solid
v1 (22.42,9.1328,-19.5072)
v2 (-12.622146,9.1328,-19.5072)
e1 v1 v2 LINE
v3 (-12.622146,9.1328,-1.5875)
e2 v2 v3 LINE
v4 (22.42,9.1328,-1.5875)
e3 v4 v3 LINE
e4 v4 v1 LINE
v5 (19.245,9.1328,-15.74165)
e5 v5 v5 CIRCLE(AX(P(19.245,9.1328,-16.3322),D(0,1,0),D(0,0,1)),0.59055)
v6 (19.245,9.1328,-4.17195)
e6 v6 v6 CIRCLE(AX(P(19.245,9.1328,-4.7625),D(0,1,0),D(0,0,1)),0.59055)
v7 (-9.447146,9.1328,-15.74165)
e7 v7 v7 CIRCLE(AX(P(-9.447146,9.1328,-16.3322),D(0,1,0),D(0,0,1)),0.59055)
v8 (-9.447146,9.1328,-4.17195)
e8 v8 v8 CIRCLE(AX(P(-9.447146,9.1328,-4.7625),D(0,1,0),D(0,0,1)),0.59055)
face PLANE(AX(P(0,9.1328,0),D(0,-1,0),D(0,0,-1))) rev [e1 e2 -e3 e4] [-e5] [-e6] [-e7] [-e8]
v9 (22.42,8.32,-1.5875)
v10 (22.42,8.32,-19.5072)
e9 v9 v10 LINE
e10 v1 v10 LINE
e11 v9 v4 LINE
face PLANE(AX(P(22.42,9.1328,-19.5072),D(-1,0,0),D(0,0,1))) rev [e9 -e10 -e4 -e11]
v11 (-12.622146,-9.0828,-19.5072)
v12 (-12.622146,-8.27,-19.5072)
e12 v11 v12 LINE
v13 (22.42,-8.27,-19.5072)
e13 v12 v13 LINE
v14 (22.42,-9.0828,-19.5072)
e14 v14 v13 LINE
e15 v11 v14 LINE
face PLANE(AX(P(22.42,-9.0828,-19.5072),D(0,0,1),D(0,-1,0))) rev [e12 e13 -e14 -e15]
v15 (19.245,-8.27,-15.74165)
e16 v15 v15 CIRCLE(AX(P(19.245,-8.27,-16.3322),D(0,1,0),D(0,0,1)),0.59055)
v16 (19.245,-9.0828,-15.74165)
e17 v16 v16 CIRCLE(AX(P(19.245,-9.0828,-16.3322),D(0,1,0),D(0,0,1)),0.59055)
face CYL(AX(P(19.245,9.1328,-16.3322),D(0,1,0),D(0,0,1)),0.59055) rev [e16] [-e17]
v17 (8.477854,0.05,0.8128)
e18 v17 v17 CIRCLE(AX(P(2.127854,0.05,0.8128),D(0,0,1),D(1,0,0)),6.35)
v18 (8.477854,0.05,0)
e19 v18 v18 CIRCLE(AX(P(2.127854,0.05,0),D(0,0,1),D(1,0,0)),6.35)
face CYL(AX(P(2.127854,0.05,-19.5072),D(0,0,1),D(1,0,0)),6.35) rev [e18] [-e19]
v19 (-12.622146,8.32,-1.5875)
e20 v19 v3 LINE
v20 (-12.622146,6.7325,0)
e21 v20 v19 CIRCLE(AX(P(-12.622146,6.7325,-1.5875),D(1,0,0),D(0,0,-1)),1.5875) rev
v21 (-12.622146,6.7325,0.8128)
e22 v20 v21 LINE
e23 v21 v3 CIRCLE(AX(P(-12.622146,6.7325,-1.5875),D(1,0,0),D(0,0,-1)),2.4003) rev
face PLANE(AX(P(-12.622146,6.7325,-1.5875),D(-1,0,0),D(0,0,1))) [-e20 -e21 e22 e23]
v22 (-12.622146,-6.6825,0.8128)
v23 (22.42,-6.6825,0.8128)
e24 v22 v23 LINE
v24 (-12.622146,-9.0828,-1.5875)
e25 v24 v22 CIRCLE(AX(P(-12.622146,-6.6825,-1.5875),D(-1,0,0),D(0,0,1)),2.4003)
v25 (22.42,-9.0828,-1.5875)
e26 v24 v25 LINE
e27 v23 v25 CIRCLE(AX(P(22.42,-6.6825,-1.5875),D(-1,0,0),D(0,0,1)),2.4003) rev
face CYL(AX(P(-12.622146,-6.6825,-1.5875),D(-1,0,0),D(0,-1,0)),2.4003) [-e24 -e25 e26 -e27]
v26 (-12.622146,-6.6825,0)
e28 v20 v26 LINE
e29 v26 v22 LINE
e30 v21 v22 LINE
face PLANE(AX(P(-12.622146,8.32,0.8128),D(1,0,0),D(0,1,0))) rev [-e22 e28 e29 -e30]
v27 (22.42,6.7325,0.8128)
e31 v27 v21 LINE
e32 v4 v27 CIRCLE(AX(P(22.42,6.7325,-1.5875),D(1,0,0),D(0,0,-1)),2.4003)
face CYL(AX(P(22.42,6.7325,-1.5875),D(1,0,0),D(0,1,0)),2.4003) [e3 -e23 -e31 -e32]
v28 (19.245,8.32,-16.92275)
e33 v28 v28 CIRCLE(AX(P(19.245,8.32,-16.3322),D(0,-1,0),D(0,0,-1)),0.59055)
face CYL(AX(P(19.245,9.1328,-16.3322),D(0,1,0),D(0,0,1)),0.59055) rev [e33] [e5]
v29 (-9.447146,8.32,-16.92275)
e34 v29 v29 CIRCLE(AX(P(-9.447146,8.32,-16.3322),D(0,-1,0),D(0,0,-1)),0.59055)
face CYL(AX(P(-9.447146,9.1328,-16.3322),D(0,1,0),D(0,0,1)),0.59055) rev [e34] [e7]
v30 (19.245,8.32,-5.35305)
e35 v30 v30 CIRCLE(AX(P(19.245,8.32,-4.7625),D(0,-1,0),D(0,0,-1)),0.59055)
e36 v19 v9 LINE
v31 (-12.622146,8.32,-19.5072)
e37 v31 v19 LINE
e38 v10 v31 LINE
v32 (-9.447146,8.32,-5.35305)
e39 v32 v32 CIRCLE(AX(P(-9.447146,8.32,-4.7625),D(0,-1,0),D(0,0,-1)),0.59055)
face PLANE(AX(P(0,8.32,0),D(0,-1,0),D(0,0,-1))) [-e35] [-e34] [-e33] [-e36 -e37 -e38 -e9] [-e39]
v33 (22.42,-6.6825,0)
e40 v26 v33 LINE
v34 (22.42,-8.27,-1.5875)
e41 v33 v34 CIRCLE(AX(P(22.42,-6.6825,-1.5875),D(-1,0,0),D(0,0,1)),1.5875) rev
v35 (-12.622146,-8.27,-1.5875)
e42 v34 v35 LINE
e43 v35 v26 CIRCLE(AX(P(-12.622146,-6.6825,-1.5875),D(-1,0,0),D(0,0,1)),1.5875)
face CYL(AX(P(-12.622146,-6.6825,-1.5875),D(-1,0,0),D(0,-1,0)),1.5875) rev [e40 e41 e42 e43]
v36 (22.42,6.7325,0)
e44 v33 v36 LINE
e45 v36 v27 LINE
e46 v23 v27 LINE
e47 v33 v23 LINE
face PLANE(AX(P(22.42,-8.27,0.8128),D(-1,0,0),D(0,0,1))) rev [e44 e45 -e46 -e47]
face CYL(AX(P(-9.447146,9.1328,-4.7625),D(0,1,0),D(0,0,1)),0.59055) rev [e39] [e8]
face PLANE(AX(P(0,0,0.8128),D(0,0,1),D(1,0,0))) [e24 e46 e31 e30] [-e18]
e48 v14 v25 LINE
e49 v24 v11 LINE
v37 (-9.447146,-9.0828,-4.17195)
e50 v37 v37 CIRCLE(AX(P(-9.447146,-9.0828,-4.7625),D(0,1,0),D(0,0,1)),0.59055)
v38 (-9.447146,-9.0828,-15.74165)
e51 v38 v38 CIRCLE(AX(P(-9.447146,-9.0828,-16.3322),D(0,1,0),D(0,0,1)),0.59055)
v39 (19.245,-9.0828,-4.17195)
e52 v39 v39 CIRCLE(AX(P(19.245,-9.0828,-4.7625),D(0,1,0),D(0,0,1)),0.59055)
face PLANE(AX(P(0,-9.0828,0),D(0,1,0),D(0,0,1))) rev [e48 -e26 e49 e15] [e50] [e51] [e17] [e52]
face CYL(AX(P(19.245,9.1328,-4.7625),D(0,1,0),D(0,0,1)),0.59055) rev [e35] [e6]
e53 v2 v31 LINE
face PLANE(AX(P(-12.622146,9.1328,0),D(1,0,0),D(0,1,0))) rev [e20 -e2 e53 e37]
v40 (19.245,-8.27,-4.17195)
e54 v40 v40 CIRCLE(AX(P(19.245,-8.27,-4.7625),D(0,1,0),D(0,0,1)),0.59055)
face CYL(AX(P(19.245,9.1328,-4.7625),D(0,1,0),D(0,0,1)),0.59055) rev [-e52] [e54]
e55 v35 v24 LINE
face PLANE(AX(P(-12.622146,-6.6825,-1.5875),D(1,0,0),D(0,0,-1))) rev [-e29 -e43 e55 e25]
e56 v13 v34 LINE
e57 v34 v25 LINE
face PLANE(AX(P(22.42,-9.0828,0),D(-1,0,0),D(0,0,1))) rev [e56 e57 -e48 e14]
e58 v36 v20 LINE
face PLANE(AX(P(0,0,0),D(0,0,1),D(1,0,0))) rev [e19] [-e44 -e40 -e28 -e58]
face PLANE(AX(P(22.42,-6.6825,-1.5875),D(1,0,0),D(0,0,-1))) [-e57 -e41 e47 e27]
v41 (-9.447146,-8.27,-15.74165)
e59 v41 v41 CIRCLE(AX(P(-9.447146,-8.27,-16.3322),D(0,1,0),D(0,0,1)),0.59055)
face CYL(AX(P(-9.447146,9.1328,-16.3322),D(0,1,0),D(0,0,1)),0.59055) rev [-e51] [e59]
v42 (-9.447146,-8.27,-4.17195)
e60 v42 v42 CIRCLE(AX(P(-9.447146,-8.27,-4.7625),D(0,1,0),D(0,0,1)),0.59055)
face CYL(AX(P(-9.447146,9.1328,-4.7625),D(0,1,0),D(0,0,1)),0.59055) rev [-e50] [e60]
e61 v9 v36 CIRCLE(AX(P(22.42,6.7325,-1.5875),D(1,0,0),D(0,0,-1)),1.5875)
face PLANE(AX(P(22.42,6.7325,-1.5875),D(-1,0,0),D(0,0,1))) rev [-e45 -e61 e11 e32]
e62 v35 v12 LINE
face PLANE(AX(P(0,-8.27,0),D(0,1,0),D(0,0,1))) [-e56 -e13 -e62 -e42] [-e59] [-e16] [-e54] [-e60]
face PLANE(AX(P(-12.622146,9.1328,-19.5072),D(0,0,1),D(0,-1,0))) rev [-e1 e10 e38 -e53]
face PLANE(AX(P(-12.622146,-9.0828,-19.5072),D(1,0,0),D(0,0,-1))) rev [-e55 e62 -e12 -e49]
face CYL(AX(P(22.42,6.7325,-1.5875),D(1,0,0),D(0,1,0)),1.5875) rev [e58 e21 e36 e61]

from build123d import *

# Parameters (mm, degrees)
BASE_FLANGE1_DEPTH             = 0.8128
EDGE_FLANGE1_STRIP_W           = 6.4262
EDGE_FLANGE1_STRIP_H           = 0.8128
EDGE_FLANGE1_STRIP_CUT_DEPTH   = 35.042145822
EDGE_FLANGE1_STRIP_2_W         = 6.4262
EDGE_FLANGE1_STRIP_2_H         = 0.8128
EDGE_FLANGE1_STRIP_CUT_2_DEPTH = 35.042145822
EDGE_FLANGE1_DEPTH             = 35.042145822
EDGE_FLANGE1_BEND_DEPTH        = 35.042145822
SKETCH12_R                     = 6.35
CUT_EXTRUDE1_DEPTH             = 32.60643662
F_56_0_0465_DIAMETER_HOLE1_D   = 1.1811


# Sheet-metal steps are written as plain solids
with BuildPart() as part:
    # Sketch1 → Base-Flange1 (new body)
    with BuildSketch(Plane.XY):
        Polygon((-12.622145822, 8.32), (16.07, 8.32), (22.42, 8.32), (22.42, -8.27), (16.07, -8.27), (-12.622145822, -8.27), align=None)
    extrude(amount=BASE_FLANGE1_DEPTH)

    # Edge-Flange1 strip (across the edge) → Edge-Flange1 strip cut (cut)
    with BuildSketch(Plane(origin=(22.42, -8.27, 0), x_dir=(0, 1, 0), z_dir=(-1, 0, 0))):
        with Locations((-1.6256, -0.4064)):
            Rectangle(EDGE_FLANGE1_STRIP_W, EDGE_FLANGE1_STRIP_H)
    extrude(amount=EDGE_FLANGE1_STRIP_CUT_DEPTH, mode=Mode.SUBTRACT)

    # Edge-Flange1 strip 2 (across the edge) → Edge-Flange1 strip cut 2 (cut)
    with BuildSketch(Plane(origin=(-12.622145822, 8.32, 0), x_dir=(0, -1, 0), z_dir=(1, 0, 0))):
        with Locations((-1.6256, -0.4064)):
            Rectangle(EDGE_FLANGE1_STRIP_2_W, EDGE_FLANGE1_STRIP_2_H)
    extrude(amount=EDGE_FLANGE1_STRIP_CUT_2_DEPTH, mode=Mode.SUBTRACT)

    # Edge-Flange1 section (across the edge) → Edge-Flange1 (add)
    with BuildSketch(Plane(origin=(22.42, -8.27, 0), x_dir=(0, 1, 0), z_dir=(-1, 0, 0))):
        with BuildLine():
            Line((-0.8128, 1.5875), (-0.8128, 19.5072))
            Line((-0.8128, 19.5072), (0, 19.5072))
            Line((0, 19.5072), (0, 1.5875))
            ThreePointArc((0, 1.5875), (0.464967985, 0.464967985), (1.5875, 0))
            Line((1.5875, 0), (1.5875, -0.8128))
            ThreePointArc((1.5875, -0.8128), (-0.109768407, -0.109768407), (-0.8128, 1.5875))
        make_face()
    extrude(amount=EDGE_FLANGE1_DEPTH)

    # Edge-Flange1 section 2 (across the edge) → Edge-Flange1 bend (add)
    with BuildSketch(Plane(origin=(-12.622145822, 8.32, 0), x_dir=(0, -1, 0), z_dir=(1, 0, 0))):
        with BuildLine():
            Line((-0.8128, 1.5875), (-0.8128, 19.5072))
            Line((-0.8128, 19.5072), (0, 19.5072))
            Line((0, 19.5072), (0, 1.5875))
            ThreePointArc((0, 1.5875), (0.464967985, 0.464967985), (1.5875, 0))
            Line((1.5875, 0), (1.5875, -0.8128))
            ThreePointArc((1.5875, -0.8128), (-0.109768407, -0.109768407), (-0.8128, 1.5875))
        make_face()
    extrude(amount=EDGE_FLANGE1_BEND_DEPTH)

    # Sketch12 → Cut-Extrude1 (cut, through all)
    with BuildSketch(Plane.XY.offset(0.8128)):
        with Locations((2.127854178, 0.05)):
            Circle(SKETCH12_R)
    extrude(amount=-CUT_EXTRUDE1_DEPTH, mode=Mode.SUBTRACT)

    # #56 (0.0465) Diameter Hole1 (through all)
    with Locations(Plane(origin=(0, 9.1328, 0), x_dir=(1, 0, 0), z_dir=(0, 1, 0))):
        with Locations((19.245, 4.7625), (19.245, 16.3322), (-9.447145822, 16.3322), (-9.447145822, 4.7625)):
            Hole(F_56_0_0465_DIAMETER_HOLE1_D / 2)


solid = part.part
